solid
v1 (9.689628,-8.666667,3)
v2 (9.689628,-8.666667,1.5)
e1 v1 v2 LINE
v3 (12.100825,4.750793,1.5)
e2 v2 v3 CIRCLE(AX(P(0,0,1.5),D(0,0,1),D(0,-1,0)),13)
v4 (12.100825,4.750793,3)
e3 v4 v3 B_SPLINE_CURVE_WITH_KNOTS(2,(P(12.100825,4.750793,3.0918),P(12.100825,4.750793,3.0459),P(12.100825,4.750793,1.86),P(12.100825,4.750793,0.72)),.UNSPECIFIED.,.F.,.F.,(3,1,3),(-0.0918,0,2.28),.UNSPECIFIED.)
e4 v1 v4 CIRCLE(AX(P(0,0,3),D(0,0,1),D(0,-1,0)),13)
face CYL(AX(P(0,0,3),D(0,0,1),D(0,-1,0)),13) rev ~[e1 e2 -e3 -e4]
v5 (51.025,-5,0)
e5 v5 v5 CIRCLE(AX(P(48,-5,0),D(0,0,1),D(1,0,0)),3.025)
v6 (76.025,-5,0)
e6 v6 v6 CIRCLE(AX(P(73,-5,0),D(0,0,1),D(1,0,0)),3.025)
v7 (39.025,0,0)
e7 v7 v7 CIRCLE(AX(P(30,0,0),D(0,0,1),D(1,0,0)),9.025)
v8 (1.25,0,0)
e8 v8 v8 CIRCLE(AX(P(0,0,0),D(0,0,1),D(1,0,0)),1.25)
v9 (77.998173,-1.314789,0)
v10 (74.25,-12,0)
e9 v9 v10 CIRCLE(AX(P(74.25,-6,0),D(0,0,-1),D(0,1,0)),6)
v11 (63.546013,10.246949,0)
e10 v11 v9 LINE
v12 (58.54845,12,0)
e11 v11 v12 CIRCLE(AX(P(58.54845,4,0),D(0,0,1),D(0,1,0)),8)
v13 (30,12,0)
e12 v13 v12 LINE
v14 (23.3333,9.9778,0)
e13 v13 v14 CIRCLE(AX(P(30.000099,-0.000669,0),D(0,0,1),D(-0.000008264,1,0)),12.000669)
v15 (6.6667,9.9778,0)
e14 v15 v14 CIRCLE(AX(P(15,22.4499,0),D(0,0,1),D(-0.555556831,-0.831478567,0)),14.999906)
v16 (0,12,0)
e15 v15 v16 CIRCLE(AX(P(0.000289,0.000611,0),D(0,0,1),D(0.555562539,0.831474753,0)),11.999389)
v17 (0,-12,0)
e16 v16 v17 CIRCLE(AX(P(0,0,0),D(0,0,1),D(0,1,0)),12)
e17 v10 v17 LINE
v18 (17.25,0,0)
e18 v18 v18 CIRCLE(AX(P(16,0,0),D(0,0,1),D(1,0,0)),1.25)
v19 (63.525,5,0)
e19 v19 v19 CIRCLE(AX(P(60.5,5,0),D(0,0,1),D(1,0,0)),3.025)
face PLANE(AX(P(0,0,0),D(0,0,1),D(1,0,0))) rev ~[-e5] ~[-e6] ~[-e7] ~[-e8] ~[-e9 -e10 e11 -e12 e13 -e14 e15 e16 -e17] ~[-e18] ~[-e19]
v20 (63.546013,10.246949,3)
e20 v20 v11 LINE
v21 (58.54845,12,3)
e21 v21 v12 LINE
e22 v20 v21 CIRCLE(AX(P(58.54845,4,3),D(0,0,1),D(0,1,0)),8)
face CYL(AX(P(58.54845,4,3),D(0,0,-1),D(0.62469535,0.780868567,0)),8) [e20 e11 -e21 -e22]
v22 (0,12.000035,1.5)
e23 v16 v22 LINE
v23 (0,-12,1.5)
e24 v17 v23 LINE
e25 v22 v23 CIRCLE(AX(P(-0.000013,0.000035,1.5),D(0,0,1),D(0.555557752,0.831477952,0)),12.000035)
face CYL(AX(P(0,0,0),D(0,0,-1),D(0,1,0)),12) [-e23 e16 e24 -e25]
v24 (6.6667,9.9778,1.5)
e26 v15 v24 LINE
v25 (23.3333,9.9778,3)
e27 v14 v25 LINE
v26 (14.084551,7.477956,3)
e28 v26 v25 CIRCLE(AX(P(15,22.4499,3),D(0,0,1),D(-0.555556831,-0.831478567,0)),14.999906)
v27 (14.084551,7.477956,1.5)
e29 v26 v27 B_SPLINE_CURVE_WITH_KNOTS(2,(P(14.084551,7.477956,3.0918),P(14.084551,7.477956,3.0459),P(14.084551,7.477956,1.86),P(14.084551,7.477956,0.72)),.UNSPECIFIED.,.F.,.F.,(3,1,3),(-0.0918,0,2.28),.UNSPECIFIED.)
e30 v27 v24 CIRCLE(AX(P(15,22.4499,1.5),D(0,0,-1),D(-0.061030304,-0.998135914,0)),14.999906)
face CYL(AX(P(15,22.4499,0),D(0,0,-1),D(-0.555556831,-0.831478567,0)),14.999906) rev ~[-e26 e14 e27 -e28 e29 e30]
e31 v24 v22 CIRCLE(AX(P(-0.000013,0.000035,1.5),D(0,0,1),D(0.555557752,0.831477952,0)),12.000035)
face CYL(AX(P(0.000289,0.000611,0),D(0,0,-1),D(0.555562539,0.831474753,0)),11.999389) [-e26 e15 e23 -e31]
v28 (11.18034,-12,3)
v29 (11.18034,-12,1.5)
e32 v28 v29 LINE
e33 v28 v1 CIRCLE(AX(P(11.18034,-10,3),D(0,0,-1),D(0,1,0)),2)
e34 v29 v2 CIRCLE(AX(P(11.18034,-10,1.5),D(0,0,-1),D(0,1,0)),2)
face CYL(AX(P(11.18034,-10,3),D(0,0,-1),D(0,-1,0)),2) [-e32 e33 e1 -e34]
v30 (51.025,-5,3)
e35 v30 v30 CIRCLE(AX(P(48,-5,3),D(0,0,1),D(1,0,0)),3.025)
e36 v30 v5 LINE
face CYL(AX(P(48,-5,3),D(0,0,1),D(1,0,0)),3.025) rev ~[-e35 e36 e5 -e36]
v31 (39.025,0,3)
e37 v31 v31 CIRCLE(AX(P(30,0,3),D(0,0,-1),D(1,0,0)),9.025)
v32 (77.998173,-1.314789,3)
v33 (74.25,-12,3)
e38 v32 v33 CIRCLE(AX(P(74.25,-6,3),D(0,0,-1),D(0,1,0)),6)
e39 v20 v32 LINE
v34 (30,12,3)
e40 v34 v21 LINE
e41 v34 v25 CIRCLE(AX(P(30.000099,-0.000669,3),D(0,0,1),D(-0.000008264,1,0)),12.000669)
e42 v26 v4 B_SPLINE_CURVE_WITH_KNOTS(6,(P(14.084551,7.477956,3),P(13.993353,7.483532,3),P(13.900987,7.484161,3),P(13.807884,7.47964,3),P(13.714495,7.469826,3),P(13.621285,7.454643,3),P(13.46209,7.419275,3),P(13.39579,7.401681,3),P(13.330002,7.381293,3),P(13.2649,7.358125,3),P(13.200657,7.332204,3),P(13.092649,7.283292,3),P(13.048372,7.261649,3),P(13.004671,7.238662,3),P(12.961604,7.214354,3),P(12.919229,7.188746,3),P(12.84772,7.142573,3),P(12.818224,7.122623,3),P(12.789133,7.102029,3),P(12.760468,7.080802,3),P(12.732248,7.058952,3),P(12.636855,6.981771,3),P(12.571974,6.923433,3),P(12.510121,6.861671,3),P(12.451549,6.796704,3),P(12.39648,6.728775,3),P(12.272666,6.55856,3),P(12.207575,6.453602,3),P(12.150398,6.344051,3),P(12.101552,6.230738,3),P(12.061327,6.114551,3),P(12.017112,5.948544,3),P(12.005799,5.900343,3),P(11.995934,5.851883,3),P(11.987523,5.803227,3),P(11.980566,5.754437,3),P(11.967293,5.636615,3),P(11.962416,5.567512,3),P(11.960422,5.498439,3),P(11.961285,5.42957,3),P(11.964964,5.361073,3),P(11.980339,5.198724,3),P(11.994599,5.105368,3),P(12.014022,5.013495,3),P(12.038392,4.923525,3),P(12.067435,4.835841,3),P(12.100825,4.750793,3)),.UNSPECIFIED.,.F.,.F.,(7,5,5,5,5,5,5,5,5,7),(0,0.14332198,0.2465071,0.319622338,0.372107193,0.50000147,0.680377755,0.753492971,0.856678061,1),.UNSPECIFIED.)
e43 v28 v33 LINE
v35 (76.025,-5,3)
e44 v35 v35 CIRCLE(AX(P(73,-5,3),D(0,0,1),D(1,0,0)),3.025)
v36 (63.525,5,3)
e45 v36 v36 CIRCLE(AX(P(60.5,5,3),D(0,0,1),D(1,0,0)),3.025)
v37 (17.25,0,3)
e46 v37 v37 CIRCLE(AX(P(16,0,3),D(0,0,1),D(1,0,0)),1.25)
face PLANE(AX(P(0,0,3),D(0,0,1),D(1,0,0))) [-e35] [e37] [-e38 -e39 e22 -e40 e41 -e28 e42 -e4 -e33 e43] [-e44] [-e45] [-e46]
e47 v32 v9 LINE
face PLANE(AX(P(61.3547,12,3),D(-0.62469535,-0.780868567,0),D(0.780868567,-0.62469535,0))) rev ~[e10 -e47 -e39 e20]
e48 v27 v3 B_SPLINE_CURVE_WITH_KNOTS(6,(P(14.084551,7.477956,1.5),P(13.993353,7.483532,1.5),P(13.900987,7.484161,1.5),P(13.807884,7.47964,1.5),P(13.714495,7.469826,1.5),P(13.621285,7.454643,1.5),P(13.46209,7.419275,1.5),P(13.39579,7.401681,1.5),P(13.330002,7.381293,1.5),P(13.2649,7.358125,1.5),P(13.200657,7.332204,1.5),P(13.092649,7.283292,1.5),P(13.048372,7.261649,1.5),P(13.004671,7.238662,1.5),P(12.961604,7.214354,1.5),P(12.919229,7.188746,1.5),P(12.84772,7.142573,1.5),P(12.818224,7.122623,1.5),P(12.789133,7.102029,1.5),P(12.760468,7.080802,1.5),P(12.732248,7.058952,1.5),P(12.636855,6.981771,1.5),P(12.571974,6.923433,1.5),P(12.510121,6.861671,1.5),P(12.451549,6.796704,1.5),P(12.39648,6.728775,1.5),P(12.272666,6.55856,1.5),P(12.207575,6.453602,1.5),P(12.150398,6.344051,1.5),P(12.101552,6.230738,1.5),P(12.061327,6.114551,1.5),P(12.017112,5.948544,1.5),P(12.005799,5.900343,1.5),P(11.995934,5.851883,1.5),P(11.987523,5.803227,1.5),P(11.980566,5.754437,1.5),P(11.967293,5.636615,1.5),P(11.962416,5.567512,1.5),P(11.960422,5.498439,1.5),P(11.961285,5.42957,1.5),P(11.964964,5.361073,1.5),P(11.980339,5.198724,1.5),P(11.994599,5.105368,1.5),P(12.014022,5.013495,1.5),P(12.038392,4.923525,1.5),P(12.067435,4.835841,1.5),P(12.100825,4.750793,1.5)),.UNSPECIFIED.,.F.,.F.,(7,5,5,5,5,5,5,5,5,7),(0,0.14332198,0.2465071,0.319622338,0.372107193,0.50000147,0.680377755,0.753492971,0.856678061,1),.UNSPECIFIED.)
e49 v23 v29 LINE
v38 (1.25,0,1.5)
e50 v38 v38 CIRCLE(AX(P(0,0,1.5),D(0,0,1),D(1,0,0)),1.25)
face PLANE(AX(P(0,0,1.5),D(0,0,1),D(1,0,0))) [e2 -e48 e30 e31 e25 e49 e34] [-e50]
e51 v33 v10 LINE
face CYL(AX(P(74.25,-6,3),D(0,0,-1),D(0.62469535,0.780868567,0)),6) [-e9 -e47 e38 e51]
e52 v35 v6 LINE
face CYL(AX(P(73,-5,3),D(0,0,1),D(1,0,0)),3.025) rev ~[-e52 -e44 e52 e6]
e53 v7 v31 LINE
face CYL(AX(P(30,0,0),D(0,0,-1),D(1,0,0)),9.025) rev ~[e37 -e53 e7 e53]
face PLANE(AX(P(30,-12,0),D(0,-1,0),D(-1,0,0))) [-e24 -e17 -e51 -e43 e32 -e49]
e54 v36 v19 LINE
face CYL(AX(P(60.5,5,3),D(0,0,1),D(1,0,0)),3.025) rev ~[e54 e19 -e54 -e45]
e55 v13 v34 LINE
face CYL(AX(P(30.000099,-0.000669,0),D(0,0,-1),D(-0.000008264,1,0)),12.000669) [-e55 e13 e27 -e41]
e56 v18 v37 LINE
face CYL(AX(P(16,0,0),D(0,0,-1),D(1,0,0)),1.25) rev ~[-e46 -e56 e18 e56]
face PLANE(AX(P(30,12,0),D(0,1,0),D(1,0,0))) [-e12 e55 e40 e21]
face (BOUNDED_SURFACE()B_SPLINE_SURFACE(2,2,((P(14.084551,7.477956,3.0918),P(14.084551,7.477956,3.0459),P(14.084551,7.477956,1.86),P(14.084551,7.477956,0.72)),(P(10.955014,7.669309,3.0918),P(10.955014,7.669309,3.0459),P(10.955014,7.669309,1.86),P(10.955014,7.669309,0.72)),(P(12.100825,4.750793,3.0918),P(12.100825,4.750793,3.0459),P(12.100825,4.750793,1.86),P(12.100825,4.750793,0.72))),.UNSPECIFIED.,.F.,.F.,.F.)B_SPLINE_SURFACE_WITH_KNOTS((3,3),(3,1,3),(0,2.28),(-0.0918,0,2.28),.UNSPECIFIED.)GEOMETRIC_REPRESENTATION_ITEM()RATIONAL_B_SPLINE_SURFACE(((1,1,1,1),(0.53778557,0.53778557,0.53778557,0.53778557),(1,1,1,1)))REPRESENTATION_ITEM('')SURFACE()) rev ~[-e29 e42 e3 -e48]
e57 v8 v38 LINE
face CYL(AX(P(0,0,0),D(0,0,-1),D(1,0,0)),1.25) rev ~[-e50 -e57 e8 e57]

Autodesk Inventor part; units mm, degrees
ref_plane "YZ Plane" through (0, 0, 0) normal (1, 0, 0) x (0, 1, 0)
ref_plane "XZ Plane" through (0, 0, 0) normal (0, 1, 0) x (-1, 0, 0)
ref_plane "XY Plane" through (0, 0, 0) normal (0, 0, 1) x (1, 0, 0)
sketch "スケッチ1" plane through (0, 0, 0) normal (0, 0, 1) x (1, 0, 0)
  line L0 (0, 0) -> (30, 0) construction
  line L1 (0, 12) -> (30, 12)
  line L2 (30, -12) -> (0, -12)
  arc A0 (0, 12) -> (0, -12) centre (0, 0) ccw
  arc A1 (30, -12) -> (30, 12) centre (30, 0) ccw
  circle A2 centre (0, 0) radius 1.25
  circle A3 centre (30, 0) radius 9.025
  arc A4 (6.6667, 9.9778) -> (23.3333, 9.9778) centre (15, 22.4499) ccw
  arc A5 (30, 12) -> (30, -12) centre (30, 0) ccw construction
  arc A6 (0, -12) -> (0, 12) centre (0, 0) ccw construction
  arc A7 (6.6667, 9.9778) -> (0, 12) centre (0, 0) ccw
  arc A8 (30, 12) -> (23.3333, 9.9778) centre (30, 0) ccw
  line L3 (30, 12) -> (92.8308, 12)
  line L4 (92.8308, 12) -> (92.8308, -12)
  line L5 (92.8308, -12) -> (30, -12)
  line L6 (30, -12) -> (30, 12)
  circle A9 centre (16, 0) radius 1.25
  dimension "d0" = 30
  dimension "d1" = 12
  dimension "d2" = 2.5
  dimension "d3" = 18.05
  dimension "d6" = 15
  dimension "d11" = 2.5
  dimension "d12" = 16
extrude "押し出し1" add sketch "スケッチ1" along normal blind 3 contours A7 A4 A8 L6 A3 L2 A0 | L3 L4 L5 A1 | A1 L6 A3
sketch "スケッチ2" plane through (0, 0, 3) normal (0, 0, 1) x (1, 0, 0)
  arc A0 (30, 12) -> (23.3333, 9.9778) centre (30, 0) ccw projected
  arc A1 (6.6667, 9.9778) -> (23.3333, 9.9778) centre (15, 22.4499) ccw projected
  arc A2 (6.6667, 9.9778) -> (0, -12) centre (0, 0) ccw projected
  line L0 (0, -12) -> (92.8308, -12) projected
  line L1 (92.8308, -12) -> (92.8308, 12) projected
  line L2 (92.8308, 12) -> (30, 12) projected
  circle A3 centre (0, 0) radius 1.25 projected
  circle A4 centre (30, 0) radius 9.025 projected
  line L3 (0, -12) -> (92.8308, -12) projected
  arc A5 (6.6667, 9.9778) -> (23.3333, 9.9778) centre (15, 22.4499) ccw projected
  arc A6 (0, -12) -> (6.6667, 9.9778) centre (0, 0) ccw
  arc A7 (0, -13) -> (7.8, 10.4) centre (0, 0) ccw
  point P0 (5, -12)
  point P1 (9.9986, 8.3083)
  dimension "d7" = 1
extrude "押し出し2" cut sketch "スケッチ2" against normal blind 1.5 contours A7 L0 A6 A1 | A6 A2
fillet "フィレット1" radius 2 2 edges at (9.9986, 8.3083, 2.25) (5, -12, 2.25)
sketch "スケッチ3" plane through (0, 0, 3) normal (0, 0, 1) x (1, 0, 0)
  arc A0 (30.0122, 16.3221) -> (24.9131, 15.5052) centre (30.0122, 0) ccw
  arc A1 (6.6694, 14.2981) -> (24.9131, 15.5052) centre (15.0061, 26.768) ccw
  arc A2 (6.6694, 14.2981) -> (0, -7.6779) centre (0, 4.3221) ccw
  line L0 (0, -7.6779) -> (30, -7.6779)
  circle A3 centre (0, 0) radius 1.5
  circle A4 centre (16, 0) radius 1.25
  circle A5 centre (48, -5) radius 3.025
  circle A6 centre (73, -5) radius 3.025
  circle A7 centre (60.5, 5) radius 3.025
  line L1 (48, -5) -> (73, -5) construction
  line L2 (61.3547, 12) -> (92.8308, -13.1809)
  line L3 (60.5, 5) -> (73, -5) construction
  line L4 (60.5, 5) -> (60.5, -5) construction
  circle A8 centre (30, 0) radius 9.025 projected
  circle A9 centre (16, 0) radius 1.25 projected
  circle A10 centre (30, 0) radius 9.025 projected
  arc A11 (9.6896, -8.6667) -> (11.1803, -12) centre (11.1803, -10) ccw projected
  line L5 (11.1803, -12) -> (92.8308, -12) projected
  line L6 (92.8308, -12) -> (92.8308, 12) projected
  line L7 (92.8308, 12) -> (30, 12) projected
  arc A12 (30, 12) -> (23.3333, 9.9778) centre (30, 0) ccw projected
  arc A13 (14.0846, 7.4779) -> (23.3333, 9.9778) centre (15, 22.4499) ccw projected
  arc A14 (14.0846, 7.4779) -> (12.1008, 4.7507) centre (13.9625, 5.4816) ccw projected
  arc A15 (9.6896, -8.6667) -> (12.1008, 4.7507) centre (0, 0) ccw projected
  line L8 (92.8308, 12) -> (30, 12) projected
  line L9 (92.8308, -12) -> (92.8308, 12) projected
  point P0 (60.5, 0)
  point P1 (61.3547, 12)
  point P2 (91.3547, -12)
  point P3 (91.3547, -12)
  dimension "d13" = 6.05
  dimension "d14" = 6.05
  dimension "d15" = 6.05
  dimension "d16" = 25
  dimension "d17" = 10
  dimension "d19" = 6
  dimension "d20" = 18
extrude "押し出し3" cut sketch "スケッチ3" against normal blind 10 contours A5 | A6 | A7 | L7 L6 L5 L2
fillet "フィレット2" radius 8 1 edges at (61.3547, 12, 1.5)
fillet "フィレット3" radius 6 1 edges at (91.3547, -12, 1.5)
properties part number "揺動節"
